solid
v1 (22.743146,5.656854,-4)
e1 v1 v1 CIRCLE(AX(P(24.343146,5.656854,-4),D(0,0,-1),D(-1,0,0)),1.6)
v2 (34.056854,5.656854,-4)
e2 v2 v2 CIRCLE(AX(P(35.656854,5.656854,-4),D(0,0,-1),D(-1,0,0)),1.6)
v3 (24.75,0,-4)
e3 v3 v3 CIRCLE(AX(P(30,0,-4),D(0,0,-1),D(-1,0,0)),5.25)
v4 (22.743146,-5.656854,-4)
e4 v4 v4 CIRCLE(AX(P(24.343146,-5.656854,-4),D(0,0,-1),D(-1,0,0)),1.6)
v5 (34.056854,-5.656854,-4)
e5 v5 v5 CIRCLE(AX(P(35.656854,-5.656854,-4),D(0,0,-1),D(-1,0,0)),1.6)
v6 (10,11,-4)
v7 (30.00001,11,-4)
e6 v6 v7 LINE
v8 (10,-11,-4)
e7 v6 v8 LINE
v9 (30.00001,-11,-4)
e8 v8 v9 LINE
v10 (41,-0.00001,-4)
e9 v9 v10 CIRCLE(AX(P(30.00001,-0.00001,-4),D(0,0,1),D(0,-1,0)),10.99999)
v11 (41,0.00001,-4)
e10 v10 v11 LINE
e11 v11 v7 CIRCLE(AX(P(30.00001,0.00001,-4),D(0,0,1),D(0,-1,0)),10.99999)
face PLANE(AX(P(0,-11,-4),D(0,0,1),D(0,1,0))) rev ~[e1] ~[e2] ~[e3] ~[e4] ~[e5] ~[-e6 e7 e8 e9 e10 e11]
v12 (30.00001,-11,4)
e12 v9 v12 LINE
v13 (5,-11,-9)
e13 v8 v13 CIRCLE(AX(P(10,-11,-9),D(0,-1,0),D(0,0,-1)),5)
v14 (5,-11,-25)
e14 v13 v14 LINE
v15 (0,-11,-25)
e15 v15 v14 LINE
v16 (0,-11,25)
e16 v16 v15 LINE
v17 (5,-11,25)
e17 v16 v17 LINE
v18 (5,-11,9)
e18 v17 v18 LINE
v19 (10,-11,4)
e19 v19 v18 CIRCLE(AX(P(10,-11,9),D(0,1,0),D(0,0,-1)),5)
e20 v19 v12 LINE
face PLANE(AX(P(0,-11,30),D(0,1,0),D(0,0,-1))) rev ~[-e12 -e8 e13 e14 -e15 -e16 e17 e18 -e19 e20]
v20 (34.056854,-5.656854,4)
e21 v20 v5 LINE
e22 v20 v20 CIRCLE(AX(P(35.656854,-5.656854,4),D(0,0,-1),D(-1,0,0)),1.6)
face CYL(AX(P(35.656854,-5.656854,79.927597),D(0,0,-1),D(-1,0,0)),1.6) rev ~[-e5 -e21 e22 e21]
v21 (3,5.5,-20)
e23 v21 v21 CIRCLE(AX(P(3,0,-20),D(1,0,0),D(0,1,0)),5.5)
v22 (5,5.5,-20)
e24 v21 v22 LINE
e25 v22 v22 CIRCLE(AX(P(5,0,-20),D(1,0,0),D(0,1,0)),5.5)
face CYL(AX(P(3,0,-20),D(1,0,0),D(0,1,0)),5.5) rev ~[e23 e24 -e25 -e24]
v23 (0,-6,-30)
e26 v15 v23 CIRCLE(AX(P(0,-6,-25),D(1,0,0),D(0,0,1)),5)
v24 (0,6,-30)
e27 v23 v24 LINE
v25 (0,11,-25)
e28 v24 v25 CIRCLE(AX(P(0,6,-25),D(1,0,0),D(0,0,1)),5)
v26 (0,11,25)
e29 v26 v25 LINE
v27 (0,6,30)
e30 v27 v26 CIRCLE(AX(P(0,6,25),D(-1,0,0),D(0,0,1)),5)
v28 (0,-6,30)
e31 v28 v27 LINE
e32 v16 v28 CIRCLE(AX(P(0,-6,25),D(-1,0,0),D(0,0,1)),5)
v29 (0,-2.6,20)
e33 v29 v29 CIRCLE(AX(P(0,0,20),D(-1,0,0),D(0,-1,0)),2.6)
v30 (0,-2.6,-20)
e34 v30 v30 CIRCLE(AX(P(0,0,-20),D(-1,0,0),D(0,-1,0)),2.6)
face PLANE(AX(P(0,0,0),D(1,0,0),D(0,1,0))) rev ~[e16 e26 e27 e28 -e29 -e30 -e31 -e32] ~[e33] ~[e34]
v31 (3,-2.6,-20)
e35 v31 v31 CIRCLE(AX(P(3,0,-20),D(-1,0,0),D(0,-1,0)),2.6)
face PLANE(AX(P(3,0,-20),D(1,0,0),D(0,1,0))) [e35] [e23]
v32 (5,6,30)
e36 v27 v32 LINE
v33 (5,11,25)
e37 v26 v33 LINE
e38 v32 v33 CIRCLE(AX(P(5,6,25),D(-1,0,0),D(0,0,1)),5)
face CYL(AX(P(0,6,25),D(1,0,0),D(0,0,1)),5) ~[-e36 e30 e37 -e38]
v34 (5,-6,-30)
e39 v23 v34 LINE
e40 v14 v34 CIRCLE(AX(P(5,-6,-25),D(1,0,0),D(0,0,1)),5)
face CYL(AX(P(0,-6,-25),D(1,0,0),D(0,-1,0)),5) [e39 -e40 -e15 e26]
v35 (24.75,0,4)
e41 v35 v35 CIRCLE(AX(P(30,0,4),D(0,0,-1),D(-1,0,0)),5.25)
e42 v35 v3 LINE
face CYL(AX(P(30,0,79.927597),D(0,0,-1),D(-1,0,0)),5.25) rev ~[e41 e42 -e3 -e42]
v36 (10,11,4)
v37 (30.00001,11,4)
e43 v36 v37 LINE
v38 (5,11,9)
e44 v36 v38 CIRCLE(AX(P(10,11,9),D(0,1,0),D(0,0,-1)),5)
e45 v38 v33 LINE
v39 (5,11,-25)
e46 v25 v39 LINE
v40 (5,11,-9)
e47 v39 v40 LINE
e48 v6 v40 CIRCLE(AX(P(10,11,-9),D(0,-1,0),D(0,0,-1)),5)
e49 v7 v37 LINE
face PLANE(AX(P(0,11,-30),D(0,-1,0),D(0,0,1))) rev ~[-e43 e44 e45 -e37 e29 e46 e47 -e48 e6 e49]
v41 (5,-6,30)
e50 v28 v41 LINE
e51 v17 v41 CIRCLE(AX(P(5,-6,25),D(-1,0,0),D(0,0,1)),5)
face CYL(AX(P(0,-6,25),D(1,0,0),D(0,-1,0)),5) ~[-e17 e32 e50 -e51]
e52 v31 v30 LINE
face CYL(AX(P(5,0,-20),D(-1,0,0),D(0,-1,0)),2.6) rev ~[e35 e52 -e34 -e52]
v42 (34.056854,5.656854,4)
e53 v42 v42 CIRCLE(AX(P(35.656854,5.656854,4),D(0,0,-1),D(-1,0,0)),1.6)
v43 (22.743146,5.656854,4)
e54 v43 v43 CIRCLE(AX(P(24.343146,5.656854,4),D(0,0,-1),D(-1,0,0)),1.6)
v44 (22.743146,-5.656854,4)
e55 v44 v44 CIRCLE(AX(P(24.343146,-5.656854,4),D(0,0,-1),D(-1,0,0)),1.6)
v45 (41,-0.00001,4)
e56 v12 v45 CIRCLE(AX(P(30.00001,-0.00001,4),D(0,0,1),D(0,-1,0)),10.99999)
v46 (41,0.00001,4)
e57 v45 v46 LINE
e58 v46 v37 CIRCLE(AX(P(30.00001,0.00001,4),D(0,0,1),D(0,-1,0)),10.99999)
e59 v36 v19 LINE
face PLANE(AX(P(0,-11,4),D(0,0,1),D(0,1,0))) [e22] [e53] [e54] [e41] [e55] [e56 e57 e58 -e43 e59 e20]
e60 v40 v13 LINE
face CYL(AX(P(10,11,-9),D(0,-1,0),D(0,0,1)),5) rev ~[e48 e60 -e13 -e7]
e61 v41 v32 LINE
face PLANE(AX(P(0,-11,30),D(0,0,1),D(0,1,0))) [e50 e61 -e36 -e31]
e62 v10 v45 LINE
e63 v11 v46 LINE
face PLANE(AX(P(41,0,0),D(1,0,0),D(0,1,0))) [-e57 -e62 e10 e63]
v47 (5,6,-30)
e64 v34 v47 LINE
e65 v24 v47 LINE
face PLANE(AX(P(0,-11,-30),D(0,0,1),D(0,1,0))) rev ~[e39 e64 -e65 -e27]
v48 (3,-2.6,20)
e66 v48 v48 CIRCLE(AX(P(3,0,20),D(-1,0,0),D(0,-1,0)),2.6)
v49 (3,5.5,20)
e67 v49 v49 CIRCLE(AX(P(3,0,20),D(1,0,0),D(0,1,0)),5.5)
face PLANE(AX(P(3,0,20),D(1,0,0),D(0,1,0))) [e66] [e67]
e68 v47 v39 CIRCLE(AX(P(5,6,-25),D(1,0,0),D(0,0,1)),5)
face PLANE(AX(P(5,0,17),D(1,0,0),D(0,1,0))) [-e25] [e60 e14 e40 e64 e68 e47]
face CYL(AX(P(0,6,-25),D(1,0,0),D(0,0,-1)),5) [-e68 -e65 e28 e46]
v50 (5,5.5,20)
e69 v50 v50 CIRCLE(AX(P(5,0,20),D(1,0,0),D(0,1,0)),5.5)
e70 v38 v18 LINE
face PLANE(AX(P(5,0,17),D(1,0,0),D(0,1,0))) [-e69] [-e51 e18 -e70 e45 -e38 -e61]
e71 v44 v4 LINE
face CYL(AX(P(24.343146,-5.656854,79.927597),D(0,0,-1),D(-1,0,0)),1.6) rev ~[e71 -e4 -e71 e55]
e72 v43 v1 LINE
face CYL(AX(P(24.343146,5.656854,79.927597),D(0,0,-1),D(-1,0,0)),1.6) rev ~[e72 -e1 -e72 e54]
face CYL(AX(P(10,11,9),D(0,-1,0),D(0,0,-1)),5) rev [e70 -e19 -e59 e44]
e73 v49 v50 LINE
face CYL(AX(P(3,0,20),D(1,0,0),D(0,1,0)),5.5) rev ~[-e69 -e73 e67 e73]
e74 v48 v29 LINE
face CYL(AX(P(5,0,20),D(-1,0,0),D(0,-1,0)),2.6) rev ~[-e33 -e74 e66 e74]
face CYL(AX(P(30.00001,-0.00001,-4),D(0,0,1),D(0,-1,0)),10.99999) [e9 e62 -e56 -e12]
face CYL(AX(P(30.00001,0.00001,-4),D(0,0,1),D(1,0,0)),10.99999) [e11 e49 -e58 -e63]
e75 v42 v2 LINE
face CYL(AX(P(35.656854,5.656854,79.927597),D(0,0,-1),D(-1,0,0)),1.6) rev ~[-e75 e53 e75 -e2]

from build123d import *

# Parameters (mm, degrees)
F1_W            = 22
F1_H            = 26
F1_H_2          = 8
F2_DEPTH        = 5
F3_DEPTH        = 41
F5_D            = 10.5
F6_D            = 3.2
F7_R            = 10.99999
F8_R            = 5
F10_D           = 5.2
F10_CBORE_D     = 11
F10_CBORE_DEPTH = 2
F11_R           = 5


# Not quite as in the source:
# - a fillet or chamfer is up to 0.001 mm smaller than in the source, because OpenCascade refuses the exact size


with BuildPart() as f2:
    # F1 (on Right) → F2 (new body)
    with BuildSketch(Plane.YZ):
        with Locations((0, 17)):
            Rectangle(F1_W, F1_H)
        Rectangle(F1_W, F1_H_2)
        with Locations((0, -17)):
            Rectangle(F1_W, F1_H)
    extrude(amount=F2_DEPTH)

    # F1 (on Right) → F3 (join)
    with BuildSketch(Plane.YZ):
        Rectangle(F1_W, F1_H_2)
    extrude(amount=F3_DEPTH)

    # F5 (through all)
    with Locations(Plane.XY.offset(4)):
        with Locations((30, 0)):
            Hole(F5_D / 2)

    # F6 (through all)
    with Locations(Plane.XY.offset(4)):
        with Locations((24.3431457505, -5.6568542495), (24.3431457505, 5.6568542495), (35.6568542495, 5.6568542495), (35.6568542495, -5.6568542495)):
            Hole(F6_D / 2)

    # F7 (radius 11 in the source; OpenCascade refuses exactly that, so slightly less here)
    f7_edges = [f2.edges().sort_by_distance(p)[0] for p in [
        (41, 11, 0),
        (41, -11, 0),
    ]]
    fillet(f7_edges, radius=F7_R)

    # F8
    f8_edges = [f2.edges().sort_by_distance(p)[0] for p in [
        (5, 0, 4),
        (5, 0, -4),
    ]]
    fillet(f8_edges, radius=F8_R)

    # F10 (through all)
    with Locations(Plane.YZ.offset(5)):
        with Locations((0, 20), (0, -20)):
            CounterBoreHole(F10_D / 2, F10_CBORE_D / 2, F10_CBORE_DEPTH)

    # F11
    f11_edges = [f2.edges().sort_by_distance(p)[0] for p in [
        (2.5, -11, 30),
        (2.5, 11, 30),
        (2.5, -11, -30),
        (2.5, 11, -30),
    ]]
    fillet(f11_edges, radius=F11_R)


solid = f2.part
